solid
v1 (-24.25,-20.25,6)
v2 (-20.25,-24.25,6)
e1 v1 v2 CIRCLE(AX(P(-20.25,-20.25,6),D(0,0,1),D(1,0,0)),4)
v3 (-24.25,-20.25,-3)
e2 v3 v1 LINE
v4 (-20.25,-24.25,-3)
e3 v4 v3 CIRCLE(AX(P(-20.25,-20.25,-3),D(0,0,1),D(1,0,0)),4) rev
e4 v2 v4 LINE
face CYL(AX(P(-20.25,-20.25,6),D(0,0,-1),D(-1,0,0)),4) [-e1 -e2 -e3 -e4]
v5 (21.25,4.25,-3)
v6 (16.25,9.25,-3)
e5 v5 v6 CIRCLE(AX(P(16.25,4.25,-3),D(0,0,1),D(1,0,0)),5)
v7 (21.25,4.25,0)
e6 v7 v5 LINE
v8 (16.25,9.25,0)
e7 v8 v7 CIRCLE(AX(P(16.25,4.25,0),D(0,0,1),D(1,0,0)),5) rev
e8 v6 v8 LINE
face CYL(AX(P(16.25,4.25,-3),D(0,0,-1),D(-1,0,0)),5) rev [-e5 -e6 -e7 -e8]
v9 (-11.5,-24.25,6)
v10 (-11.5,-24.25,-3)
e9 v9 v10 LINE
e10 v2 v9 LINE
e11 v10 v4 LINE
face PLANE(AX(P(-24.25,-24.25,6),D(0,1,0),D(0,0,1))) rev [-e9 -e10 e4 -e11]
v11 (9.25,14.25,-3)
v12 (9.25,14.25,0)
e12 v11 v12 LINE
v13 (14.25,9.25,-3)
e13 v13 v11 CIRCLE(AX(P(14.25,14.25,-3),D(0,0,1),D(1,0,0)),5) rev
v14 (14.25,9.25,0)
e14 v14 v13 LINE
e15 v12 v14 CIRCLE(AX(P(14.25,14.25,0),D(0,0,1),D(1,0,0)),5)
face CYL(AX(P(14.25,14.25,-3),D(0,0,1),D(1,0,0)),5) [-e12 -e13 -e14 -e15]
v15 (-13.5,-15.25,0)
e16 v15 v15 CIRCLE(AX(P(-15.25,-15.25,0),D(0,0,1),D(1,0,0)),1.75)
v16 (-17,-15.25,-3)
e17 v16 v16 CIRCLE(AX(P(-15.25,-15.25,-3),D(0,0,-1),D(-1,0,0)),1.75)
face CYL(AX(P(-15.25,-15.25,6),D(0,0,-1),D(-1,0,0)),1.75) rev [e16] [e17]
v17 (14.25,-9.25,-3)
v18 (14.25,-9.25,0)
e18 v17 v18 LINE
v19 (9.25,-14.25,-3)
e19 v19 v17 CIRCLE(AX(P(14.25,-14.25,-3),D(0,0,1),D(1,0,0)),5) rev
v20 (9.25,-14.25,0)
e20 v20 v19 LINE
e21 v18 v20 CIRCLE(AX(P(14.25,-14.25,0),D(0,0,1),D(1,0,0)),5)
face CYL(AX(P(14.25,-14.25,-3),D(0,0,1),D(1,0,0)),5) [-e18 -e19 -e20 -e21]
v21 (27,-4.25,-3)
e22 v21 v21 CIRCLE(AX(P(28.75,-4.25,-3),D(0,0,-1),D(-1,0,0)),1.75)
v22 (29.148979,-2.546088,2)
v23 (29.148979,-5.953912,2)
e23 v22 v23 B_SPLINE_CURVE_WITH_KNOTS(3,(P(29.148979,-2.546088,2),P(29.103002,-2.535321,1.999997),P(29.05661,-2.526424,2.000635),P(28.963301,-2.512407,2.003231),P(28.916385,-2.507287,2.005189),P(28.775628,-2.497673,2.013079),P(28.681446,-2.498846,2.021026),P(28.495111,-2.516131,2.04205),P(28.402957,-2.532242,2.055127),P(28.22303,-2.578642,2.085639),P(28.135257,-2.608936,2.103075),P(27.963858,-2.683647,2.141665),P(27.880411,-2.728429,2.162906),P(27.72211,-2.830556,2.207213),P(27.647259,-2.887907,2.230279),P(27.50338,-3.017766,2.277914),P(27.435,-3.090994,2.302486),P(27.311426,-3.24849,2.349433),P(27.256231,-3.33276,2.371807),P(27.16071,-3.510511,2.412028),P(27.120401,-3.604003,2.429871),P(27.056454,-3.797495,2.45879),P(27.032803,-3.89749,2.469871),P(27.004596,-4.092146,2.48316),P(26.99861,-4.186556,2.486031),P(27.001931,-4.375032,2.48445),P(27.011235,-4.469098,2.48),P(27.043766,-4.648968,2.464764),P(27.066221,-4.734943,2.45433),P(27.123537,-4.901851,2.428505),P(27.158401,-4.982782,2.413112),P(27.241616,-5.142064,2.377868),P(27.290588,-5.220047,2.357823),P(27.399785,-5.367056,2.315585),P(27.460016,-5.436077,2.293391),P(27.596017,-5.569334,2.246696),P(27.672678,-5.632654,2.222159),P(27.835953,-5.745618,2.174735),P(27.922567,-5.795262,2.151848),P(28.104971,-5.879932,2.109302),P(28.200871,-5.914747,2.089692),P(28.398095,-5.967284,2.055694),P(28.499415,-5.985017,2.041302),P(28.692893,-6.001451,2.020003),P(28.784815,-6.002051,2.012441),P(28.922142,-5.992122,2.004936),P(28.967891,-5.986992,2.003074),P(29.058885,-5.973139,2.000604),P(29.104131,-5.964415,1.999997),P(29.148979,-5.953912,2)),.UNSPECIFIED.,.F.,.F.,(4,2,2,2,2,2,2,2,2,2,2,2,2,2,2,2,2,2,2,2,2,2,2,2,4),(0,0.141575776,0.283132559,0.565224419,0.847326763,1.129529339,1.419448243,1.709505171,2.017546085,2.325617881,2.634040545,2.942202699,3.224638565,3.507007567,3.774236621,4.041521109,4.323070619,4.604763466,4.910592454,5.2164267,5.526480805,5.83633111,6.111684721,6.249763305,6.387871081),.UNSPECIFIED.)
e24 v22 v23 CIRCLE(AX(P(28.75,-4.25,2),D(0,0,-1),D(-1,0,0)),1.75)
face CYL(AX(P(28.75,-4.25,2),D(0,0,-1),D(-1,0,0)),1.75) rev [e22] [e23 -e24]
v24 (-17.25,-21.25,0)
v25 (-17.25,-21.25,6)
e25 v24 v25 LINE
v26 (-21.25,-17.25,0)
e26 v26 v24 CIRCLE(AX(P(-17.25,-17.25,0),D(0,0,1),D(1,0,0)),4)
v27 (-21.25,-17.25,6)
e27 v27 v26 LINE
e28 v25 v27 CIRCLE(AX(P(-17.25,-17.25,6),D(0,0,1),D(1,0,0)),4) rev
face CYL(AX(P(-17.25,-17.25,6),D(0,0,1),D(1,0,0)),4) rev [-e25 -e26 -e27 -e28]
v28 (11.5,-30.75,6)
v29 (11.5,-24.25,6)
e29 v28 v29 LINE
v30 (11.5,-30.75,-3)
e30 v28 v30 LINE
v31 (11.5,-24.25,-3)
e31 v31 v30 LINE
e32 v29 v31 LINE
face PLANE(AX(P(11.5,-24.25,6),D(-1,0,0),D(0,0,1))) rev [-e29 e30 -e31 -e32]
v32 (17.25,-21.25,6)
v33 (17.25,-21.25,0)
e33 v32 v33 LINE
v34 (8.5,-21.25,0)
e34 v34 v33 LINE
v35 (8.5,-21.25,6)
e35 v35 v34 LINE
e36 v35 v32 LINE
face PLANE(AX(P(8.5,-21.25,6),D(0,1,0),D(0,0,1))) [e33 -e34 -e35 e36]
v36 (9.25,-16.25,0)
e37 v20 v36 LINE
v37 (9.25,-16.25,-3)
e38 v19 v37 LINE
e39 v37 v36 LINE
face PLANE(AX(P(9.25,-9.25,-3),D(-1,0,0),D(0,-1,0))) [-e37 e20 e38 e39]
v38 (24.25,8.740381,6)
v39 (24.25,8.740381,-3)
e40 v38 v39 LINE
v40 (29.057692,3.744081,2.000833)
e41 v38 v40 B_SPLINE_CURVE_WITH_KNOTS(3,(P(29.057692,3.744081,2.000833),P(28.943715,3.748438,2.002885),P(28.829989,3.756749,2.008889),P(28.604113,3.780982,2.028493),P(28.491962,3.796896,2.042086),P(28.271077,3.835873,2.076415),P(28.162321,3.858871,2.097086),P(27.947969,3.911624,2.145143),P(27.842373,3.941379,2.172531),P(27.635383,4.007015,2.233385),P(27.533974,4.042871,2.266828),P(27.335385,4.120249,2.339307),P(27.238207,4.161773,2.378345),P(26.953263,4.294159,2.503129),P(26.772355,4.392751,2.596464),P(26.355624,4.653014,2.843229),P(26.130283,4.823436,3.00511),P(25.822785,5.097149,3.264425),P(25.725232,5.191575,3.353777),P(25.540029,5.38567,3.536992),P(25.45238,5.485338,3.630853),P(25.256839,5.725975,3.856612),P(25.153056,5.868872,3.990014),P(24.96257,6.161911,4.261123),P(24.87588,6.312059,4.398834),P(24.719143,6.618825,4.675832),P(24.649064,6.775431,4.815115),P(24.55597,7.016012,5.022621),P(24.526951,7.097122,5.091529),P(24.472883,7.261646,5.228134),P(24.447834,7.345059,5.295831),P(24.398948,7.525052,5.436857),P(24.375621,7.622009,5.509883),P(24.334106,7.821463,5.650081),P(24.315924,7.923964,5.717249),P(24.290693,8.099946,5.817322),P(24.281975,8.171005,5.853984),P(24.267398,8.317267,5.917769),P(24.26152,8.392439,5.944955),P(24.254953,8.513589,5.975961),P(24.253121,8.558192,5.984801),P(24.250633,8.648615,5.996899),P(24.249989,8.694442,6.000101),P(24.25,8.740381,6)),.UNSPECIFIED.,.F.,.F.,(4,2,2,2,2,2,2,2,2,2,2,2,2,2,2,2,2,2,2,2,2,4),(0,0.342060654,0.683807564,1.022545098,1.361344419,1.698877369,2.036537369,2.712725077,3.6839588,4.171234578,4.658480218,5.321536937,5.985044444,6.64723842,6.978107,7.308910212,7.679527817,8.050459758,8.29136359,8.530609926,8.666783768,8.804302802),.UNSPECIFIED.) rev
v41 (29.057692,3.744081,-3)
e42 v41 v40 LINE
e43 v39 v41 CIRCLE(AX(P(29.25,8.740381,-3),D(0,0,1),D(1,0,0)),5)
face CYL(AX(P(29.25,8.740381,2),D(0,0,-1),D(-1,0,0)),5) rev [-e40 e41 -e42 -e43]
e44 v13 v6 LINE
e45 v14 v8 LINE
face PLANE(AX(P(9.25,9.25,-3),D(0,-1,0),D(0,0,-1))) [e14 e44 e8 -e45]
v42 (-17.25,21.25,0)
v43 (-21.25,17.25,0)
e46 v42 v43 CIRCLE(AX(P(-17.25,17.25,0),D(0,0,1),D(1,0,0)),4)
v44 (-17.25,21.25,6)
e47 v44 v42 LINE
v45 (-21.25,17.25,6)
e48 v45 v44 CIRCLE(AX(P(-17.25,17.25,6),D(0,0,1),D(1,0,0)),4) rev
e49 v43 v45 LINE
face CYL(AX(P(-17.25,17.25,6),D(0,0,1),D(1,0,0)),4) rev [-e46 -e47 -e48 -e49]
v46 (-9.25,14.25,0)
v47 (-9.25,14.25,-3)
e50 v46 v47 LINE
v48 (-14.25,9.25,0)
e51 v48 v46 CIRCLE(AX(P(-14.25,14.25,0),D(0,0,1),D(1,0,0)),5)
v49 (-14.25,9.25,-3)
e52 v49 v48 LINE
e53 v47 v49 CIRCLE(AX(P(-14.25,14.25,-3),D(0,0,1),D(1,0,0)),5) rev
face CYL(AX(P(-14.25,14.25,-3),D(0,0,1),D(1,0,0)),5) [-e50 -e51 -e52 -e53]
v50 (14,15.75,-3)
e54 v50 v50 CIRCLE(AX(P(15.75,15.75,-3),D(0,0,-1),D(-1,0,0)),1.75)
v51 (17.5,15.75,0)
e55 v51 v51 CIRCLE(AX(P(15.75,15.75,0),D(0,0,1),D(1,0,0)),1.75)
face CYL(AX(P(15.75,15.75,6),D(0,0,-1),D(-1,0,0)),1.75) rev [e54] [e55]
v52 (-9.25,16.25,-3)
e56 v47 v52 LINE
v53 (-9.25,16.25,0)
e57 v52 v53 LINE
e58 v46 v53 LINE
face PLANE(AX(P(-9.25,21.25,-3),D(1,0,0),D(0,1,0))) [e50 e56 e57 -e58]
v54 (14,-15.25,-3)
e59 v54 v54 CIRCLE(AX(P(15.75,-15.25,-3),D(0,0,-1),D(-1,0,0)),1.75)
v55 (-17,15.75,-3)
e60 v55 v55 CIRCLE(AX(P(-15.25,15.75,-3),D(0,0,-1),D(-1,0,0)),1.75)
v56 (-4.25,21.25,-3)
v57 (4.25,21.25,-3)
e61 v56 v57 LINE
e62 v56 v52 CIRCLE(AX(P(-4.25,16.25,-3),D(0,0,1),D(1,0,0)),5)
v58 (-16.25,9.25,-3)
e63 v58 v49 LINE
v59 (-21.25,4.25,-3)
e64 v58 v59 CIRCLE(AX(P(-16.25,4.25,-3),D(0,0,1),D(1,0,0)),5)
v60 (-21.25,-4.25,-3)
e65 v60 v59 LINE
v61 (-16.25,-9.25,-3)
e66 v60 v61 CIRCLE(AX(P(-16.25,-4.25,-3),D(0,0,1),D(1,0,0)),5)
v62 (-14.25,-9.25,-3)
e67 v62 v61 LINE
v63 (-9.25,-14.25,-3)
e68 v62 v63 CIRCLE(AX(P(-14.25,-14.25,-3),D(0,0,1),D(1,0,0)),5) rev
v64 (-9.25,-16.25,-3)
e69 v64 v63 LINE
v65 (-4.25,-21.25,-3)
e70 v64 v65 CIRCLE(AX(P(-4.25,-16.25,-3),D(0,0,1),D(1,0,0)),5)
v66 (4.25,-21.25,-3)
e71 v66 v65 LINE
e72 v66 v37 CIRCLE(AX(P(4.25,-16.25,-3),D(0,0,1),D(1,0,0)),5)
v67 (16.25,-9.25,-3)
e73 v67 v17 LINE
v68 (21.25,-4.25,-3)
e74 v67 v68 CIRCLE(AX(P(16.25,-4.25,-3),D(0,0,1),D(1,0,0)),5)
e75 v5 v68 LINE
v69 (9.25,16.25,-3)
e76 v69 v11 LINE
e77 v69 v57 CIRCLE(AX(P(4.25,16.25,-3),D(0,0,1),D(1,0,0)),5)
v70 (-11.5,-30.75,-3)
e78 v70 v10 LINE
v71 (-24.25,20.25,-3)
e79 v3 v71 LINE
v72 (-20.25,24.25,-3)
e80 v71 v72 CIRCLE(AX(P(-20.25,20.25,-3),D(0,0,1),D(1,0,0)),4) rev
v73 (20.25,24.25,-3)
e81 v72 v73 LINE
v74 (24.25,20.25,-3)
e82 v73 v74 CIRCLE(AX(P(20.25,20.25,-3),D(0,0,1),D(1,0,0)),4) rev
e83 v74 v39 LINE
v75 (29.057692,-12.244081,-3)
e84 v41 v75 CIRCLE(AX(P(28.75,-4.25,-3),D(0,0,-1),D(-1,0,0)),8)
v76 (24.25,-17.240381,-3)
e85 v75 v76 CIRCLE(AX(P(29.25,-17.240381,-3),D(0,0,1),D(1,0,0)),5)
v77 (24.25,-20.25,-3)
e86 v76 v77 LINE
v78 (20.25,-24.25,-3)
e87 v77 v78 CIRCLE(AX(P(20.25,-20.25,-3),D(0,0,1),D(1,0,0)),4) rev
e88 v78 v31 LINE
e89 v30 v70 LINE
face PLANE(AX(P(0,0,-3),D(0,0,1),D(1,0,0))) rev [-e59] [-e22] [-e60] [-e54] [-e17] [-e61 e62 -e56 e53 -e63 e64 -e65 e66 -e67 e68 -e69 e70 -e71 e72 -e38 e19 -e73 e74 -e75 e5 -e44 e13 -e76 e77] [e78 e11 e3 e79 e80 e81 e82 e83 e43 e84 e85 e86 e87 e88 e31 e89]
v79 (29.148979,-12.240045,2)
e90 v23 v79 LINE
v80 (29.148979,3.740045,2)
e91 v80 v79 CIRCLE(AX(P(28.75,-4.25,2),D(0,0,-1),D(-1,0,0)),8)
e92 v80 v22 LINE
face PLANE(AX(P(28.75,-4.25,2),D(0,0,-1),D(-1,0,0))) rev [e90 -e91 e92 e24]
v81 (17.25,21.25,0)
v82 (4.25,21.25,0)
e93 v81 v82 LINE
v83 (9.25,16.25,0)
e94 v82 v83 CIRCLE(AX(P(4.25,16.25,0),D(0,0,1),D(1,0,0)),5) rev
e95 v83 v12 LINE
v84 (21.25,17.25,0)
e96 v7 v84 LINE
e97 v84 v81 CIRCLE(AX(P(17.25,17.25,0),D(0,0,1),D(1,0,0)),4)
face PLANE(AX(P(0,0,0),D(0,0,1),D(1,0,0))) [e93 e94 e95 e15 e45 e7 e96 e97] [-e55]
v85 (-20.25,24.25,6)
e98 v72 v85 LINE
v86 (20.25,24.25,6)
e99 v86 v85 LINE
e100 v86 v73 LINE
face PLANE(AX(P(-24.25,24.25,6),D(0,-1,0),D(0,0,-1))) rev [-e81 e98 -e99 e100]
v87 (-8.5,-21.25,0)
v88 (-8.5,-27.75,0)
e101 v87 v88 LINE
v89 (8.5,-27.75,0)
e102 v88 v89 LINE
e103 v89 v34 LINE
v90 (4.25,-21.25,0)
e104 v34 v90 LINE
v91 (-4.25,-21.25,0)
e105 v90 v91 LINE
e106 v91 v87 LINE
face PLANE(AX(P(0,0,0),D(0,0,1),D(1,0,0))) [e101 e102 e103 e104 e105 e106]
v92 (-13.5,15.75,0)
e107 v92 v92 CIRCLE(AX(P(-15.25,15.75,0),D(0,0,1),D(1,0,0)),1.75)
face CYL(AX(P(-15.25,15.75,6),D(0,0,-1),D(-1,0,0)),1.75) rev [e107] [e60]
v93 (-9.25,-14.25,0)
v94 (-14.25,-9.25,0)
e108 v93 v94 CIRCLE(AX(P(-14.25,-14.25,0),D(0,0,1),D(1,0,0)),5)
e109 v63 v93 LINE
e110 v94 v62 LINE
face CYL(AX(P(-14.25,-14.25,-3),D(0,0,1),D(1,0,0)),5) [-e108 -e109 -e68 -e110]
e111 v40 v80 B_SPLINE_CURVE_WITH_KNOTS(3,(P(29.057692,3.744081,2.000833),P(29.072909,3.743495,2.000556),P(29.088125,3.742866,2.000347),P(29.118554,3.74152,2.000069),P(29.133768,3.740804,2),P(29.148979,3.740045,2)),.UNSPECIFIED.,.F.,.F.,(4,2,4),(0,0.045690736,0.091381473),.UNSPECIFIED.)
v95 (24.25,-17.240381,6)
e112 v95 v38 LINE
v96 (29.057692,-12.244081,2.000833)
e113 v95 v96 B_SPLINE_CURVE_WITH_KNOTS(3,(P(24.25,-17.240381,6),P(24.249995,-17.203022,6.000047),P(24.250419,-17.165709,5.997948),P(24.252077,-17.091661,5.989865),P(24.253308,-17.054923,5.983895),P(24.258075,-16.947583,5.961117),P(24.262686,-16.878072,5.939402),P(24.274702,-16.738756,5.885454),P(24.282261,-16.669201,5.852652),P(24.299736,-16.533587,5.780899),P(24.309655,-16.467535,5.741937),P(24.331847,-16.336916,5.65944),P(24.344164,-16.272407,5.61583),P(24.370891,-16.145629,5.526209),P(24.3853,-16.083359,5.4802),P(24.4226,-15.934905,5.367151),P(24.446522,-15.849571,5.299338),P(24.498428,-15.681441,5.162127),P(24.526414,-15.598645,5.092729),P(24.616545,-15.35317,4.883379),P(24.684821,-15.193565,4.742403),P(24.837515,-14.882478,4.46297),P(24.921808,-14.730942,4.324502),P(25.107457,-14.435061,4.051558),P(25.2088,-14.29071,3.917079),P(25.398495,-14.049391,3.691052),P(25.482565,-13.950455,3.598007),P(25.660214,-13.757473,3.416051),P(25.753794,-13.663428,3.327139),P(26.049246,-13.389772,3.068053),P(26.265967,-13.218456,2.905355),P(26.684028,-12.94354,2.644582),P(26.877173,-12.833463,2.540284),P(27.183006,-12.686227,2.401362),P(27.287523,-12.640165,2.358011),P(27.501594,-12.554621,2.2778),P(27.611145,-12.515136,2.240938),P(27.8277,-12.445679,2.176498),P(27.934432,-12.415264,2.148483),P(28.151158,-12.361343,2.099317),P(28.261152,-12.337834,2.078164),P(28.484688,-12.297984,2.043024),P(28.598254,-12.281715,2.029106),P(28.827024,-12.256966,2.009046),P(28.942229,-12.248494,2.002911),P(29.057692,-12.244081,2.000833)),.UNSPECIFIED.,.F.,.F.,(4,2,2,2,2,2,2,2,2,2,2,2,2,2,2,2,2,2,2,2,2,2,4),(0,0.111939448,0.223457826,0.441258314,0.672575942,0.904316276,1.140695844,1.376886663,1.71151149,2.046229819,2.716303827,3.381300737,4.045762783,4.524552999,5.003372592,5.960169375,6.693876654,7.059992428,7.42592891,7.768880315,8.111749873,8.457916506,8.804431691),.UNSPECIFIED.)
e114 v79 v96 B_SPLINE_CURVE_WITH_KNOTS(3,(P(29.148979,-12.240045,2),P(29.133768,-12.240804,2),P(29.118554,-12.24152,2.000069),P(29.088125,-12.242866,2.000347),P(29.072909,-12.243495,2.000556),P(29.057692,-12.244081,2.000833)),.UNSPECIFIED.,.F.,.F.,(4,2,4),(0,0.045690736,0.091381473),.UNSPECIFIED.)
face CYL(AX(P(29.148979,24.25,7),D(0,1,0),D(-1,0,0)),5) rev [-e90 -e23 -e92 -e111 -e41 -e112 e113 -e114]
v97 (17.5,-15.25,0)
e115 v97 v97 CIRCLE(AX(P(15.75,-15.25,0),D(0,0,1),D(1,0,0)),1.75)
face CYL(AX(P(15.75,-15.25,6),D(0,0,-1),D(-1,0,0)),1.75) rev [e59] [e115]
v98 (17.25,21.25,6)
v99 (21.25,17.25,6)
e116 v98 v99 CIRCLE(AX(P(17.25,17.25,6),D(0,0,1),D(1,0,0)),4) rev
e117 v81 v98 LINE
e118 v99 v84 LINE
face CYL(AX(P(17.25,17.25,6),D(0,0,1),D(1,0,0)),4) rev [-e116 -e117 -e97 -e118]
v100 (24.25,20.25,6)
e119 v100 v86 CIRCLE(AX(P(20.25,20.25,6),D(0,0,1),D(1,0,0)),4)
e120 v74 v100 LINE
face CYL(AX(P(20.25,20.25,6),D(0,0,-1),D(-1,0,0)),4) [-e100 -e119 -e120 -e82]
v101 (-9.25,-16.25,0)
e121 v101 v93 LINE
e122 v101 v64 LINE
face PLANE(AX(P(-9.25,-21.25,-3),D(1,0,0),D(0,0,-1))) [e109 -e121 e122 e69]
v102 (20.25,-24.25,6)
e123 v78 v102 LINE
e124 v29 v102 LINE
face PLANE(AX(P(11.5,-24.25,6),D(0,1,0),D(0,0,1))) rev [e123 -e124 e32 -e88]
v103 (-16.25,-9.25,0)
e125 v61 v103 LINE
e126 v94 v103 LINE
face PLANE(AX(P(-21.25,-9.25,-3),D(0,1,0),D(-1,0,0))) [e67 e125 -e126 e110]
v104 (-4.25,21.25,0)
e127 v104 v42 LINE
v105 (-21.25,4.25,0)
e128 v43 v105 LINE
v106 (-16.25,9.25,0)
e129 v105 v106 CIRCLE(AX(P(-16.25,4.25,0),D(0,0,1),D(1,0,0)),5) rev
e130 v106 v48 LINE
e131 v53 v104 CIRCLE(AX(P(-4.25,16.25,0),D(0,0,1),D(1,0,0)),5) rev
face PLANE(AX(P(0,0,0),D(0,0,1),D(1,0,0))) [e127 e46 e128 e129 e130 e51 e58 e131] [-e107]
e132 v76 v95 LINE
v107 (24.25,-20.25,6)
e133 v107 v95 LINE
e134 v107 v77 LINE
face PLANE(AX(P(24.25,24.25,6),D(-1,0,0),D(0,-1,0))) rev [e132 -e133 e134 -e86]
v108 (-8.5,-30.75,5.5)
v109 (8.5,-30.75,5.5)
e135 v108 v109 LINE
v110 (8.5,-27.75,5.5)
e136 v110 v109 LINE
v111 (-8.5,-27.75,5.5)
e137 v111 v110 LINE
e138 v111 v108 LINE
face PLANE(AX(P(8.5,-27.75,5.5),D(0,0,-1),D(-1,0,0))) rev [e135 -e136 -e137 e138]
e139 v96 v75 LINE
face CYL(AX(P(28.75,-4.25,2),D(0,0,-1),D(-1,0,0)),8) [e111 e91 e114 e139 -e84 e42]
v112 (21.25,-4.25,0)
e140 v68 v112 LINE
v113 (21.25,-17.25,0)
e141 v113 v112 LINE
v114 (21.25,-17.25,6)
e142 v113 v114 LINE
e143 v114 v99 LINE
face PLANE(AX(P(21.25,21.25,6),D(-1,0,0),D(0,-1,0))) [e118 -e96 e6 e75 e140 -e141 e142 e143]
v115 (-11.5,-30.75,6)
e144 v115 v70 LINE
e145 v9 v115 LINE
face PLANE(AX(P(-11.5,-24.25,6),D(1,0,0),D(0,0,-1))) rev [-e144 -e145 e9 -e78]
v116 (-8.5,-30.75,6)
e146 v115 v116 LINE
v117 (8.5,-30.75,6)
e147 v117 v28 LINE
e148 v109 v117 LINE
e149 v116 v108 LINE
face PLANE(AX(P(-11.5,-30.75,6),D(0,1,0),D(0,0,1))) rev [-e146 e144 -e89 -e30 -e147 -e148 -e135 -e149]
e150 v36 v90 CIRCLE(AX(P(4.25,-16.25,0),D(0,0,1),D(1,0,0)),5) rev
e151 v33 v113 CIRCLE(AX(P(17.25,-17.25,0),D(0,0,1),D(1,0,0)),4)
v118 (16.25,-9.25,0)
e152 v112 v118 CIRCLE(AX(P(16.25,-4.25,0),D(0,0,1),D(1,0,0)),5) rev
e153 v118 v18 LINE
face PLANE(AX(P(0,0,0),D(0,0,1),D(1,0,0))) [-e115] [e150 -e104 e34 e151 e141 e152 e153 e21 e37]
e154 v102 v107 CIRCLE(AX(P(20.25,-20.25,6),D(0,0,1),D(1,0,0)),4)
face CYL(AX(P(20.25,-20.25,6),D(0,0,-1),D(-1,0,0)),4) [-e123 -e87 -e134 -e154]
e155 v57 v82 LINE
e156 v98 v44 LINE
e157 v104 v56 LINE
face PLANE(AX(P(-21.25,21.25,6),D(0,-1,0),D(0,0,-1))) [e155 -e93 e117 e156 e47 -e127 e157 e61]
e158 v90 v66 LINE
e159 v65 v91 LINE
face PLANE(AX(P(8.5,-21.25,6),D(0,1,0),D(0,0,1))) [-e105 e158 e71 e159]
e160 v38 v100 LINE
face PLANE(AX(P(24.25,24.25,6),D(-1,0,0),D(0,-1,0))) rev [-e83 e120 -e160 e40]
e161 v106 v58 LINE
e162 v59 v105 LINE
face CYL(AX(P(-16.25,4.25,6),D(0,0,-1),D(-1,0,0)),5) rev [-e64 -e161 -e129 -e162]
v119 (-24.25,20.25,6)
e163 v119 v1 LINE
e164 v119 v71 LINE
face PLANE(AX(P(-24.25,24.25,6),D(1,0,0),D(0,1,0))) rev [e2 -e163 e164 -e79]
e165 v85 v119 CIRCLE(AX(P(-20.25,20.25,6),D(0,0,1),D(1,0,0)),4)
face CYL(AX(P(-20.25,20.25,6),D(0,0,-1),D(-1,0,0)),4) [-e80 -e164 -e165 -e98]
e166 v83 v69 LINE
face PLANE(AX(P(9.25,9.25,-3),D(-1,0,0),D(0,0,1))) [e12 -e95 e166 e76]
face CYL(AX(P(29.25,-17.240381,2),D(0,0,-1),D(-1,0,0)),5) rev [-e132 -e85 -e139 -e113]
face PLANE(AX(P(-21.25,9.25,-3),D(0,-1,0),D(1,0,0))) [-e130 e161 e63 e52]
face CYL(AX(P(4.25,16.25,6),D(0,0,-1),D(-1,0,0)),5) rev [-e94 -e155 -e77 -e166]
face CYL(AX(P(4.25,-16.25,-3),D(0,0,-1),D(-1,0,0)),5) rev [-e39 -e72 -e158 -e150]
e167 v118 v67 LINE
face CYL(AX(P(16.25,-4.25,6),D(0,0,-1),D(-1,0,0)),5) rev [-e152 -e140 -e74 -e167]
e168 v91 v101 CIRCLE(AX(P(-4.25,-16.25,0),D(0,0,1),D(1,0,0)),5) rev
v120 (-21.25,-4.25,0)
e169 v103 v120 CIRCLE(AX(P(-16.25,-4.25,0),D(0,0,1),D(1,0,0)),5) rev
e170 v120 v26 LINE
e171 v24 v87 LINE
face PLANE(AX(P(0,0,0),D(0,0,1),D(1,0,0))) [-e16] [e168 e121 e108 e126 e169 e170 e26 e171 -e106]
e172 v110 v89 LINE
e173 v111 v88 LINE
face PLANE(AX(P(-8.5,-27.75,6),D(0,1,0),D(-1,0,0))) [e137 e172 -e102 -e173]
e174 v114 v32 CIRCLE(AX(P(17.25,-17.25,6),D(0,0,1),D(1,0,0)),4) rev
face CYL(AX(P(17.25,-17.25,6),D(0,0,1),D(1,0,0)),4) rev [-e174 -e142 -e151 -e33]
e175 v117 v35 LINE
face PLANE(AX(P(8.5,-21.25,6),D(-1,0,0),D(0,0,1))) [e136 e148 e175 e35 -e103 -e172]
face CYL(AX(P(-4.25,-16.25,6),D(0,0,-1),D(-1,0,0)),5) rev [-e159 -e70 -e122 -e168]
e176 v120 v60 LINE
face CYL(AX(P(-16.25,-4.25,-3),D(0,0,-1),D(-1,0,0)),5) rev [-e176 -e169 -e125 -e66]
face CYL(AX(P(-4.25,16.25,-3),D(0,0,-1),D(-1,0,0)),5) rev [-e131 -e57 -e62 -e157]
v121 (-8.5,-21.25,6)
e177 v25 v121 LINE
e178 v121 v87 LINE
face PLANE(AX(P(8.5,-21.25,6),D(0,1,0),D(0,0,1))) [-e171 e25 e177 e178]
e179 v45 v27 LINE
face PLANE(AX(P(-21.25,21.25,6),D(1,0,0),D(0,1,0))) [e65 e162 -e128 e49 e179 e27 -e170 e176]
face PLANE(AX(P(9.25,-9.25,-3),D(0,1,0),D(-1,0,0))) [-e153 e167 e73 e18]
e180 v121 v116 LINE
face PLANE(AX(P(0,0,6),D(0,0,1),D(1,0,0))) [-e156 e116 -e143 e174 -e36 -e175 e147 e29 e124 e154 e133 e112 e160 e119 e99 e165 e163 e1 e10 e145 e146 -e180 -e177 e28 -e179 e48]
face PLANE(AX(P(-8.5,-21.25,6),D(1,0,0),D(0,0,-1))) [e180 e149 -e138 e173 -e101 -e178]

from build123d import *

# Parameters (mm, degrees)
BOSS_EXTRUDE3_DEPTH = 6
BOSS_EXTRUDE4_DEPTH = 3
SKETCH5_W           = 17
SKETCH5_H           = 5.5
CUT_EXTRUDE1_DEPTH  = 3
SKETCH6_R           = 1.75
CUT_EXTRUDE2_DEPTH  = 41.182396643
SKETCH7_R           = 1.75
BOSS_EXTRUDE5_DEPTH = 5
FILLET1_START       = -17.240381157
FILLET1_DEPTH       = 25.980762314
FILLET1_START_2     = 2
FILLET1_2_DEPTH     = 4.000072473
FILLET1_START_3     = -3
FILLET1_3_DEPTH     = 5
FILLET2_R           = 4
FILLET3_R           = 5


with BuildPart() as part:
    # Sketch1 → Boss-Extrude3 (new body)
    with BuildSketch(Plane.XY):
        Polygon((-24.25, 24.25), (24.25, 24.25), (24.25, -24.25), (11.5, -24.25), (11.5, -30.75), (-11.5, -30.75), (-11.5, -24.25), (-24.25, -24.25), align=None)
        Polygon((-21.25, 21.25), (21.25, 21.25), (21.25, -21.25), (8.5, -21.25), (8.5, -27.75), (-8.5, -27.75), (-8.5, -21.25), (-21.25, -21.25), align=None, mode=Mode.SUBTRACT)
    extrude(amount=BOSS_EXTRUDE3_DEPTH)

    # Sketch4 → Boss-Extrude4 (add)
    with BuildSketch(Plane(origin=(0, 0, 0), x_dir=(-1, 0, 0), z_dir=(0, 0, -1))):
        Polygon((-24.25, -24.25), (-24.25, 24.25), (24.25, 24.25), (24.25, -24.25), (11.5, -24.25), (11.5, -30.75), (-11.5, -30.75), (-11.5, -24.25), align=None)
        Polygon((-9.25, 21.25), (9.25, 21.25), (9.25, 9.25), (21.25, 9.25), (21.25, -9.25), (9.25, -9.25), (9.25, -21.25), (-9.25, -21.25), (-9.25, -9.25), (-21.25, -9.25), (-21.25, 9.25), (-9.25, 9.25), align=None, mode=Mode.SUBTRACT)
    extrude(amount=BOSS_EXTRUDE4_DEPTH)

    # Sketch5 → Cut-Extrude1 (cut)
    with BuildSketch(Plane.XZ.offset(30.75)):
        with Locations((0, 8.25)):
            Rectangle(SKETCH5_W, SKETCH5_H)
    extrude(amount=-CUT_EXTRUDE1_DEPTH, mode=Mode.SUBTRACT)

    # Sketch6 → Cut-Extrude2 (cut, through all)
    with BuildSketch(Plane(origin=(0, 0, -3), x_dir=(-1, 0, 0), z_dir=(0, 0, -1))):
        with Locations((-15.75, 15.75)):
            Circle(SKETCH6_R)
        with Locations((15.25, 15.75)):
            Circle(SKETCH6_R)
        with Locations((15.25, -15.25)):
            Circle(SKETCH6_R)
        with Locations((-15.75, -15.25)):
            Circle(SKETCH6_R)
    extrude(amount=-CUT_EXTRUDE2_DEPTH, mode=Mode.SUBTRACT)

    # Sketch7 → Boss-Extrude5 (add)
    with BuildSketch(Plane(origin=(0, 0, -3), x_dir=(-1, 0, 0), z_dir=(0, 0, -1))):
        with BuildLine():
            Line((-28.75, 3.75), (-24.25, 3.75))
            Line((-24.25, 3.75), (-24.25, -12.25))
            Line((-24.25, -12.25), (-28.75, -12.25))
            ThreePointArc((-28.75, -12.25), (-36.75, -4.25), (-28.75, 3.75))
        make_face()
        with Locations((-28.75, -4.25)):
            Circle(SKETCH7_R, mode=Mode.SUBTRACT)
    extrude(amount=-BOSS_EXTRUDE5_DEPTH)

    # Fillet1: read off the stored shape, not the designer's step
    # Fillet1 outline → Fillet1 (add)
    with BuildSketch(Plane(origin=(0, 0, 0), x_dir=(1, 0, 0), z_dir=(0, 1, 0)).offset(FILLET1_START)):
        with BuildLine():
            ThreePointArc((24.249985207, -6.000072473), (25.986673178, -3.127040044), (29.148979486, -2))
            Line((29.148979486, -2), (24.25, -2))
            Line((24.25, -2), (24.249985207, -6.000072473))
        make_face()
    extrude(amount=FILLET1_DEPTH)

    # Fillet1 2 outline → Fillet1 2 (cut)
    with BuildSketch(Plane.XY.offset(FILLET1_START_2)):
        with BuildLine():
            ThreePointArc((29.057692308, -12.24408065), (25.647116539, -13.77350483), (24.25, -17.240381057))
            Line((24.25, -17.240381057), (29.148979486, -17.240381157))
            Line((29.148979486, -17.240381157), (29.148979486, -12.240044766))
            ThreePointArc((29.148979486, -12.240044766), (29.103341659, -12.242193045), (29.057692308, -12.24408065))
        make_face()
        with BuildLine():
            ThreePointArc((29.057692308, 3.74408065), (29.103341659, 3.742193045), (29.148979486, 3.740044766))
            Line((29.148979486, 3.740044766), (29.148979486, 8.740381157))
            Line((29.148979486, 8.740381157), (24.25, 8.740381057))
            ThreePointArc((24.25, 8.740381057), (25.647116539, 5.27350483), (29.057692308, 3.74408065))
        make_face()
        with BuildLine():
            Line((29.148979486, -5.953911785), (29.148979486, -2.546088215))
            ThreePointArc((29.148979486, -2.546088215), (27, -4.25), (29.148979486, -5.953911785))
        make_face()
    extrude(amount=FILLET1_2_DEPTH, mode=Mode.SUBTRACT)

    # Fillet1 3 outline → Fillet1 3 (add)
    with BuildSketch(Plane.XY.offset(FILLET1_START_3)):
        with BuildLine():
            Line((24.25, -12.25), (24.25, -17.240381057))
            ThreePointArc((24.25, -17.240381057), (25.647116539, -13.77350483), (29.057692308, -12.24408065))
            ThreePointArc((29.057692308, -12.24408065), (28.90387462, -12.248520026), (28.75, -12.25))
            Line((28.75, -12.25), (24.25, -12.25))
        make_face()
        with BuildLine():
            ThreePointArc((28.75, 3.75), (28.90387462, 3.748520026), (29.057692308, 3.74408065))
            ThreePointArc((29.057692308, 3.74408065), (25.647116539, 5.27350483), (24.25, 8.740381057))
            Line((24.25, 8.740381057), (24.25, 3.75))
            Line((24.25, 3.75), (28.75, 3.75))
        make_face()
    extrude(amount=FILLET1_3_DEPTH)

    # Fillet2
    fillet2_edges = [part.edges().sort_by_distance(p)[0] for p in [
        (-24.25, 24.25, 1.5),
        (24.25, 24.25, 1.5),
        (24.25, -24.25, 1.5),
        (-24.25, -24.25, 1.5),
        (21.25, -21.25, 3),
        (21.25, 21.25, 3),
        (-21.25, 21.25, 3),
        (-21.25, -21.25, 3),
    ]]
    fillet(fillet2_edges, radius=FILLET2_R)

    # Fillet3
    # the kernel refuses this fillet: 5 mm, written as the material it adds along each edge
    with BuildSketch(Plane(origin=(21.25, 9.25, 0), x_dir=(0, -1, 0), z_dir=(0, 0, -1)), Plane(origin=(9.25, -21.25, 0), x_dir=(-1, 0, 0), z_dir=(0, 0, -1)), Plane(origin=(-21.25, -9.25, 0), x_dir=(0, 1, 0), z_dir=(0, 0, -1)), Plane(origin=(-9.25, 21.25, 0), x_dir=(1, 0, 0), z_dir=(0, 0, -1))) as fillet3_piece_1:
        with BuildLine():
            CenterArc((FILLET3_R, FILLET3_R), FILLET3_R, 180, 90)
            Line((0, FILLET3_R), (0, 0))
            Line((0, 0), (FILLET3_R, 0))
        make_face()
    extrude(amount=3)
    with BuildSketch(Plane(origin=(21.25, -9.25, 0), x_dir=(0, 1, 0), z_dir=(0, 0, -1)), Plane(origin=(-9.25, -21.25, 0), x_dir=(1, 0, 0), z_dir=(0, 0, -1)), Plane(origin=(-21.25, 9.25, 0), x_dir=(0, -1, 0), z_dir=(0, 0, -1)), Plane(origin=(9.25, 21.25, 0), x_dir=(-1, 0, 0), z_dir=(0, 0, -1))) as fillet3_piece_2:
        with BuildLine():
            CenterArc((FILLET3_R, -FILLET3_R), FILLET3_R, 90, 90)
            Line((0, -FILLET3_R), (0, 0))
            Line((0, 0), (FILLET3_R, 0))
        make_face()
    extrude(amount=3)
    # the kernel refuses this fillet: 5 mm, written as the material it takes off along each edge
    with BuildSketch(Plane(origin=(9.25, 9.25, 12.5), x_dir=(1, 0, 0), z_dir=(0, 0, -1)), Plane(origin=(9.25, -9.25, 12.5), x_dir=(0, -1, 0), z_dir=(0, 0, -1)), Plane(origin=(-9.25, -9.25, 12.5), x_dir=(-1, 0, 0), z_dir=(0, 0, -1)), Plane(origin=(-9.25, 9.25, 12.5), x_dir=(0, 1, 0), z_dir=(0, 0, -1))) as fillet3_2_piece_1:
        with BuildLine():
            CenterArc((FILLET3_R, -FILLET3_R), FILLET3_R, 90, 90)
            Line((0, -FILLET3_R), (0, 0))
            Line((0, 0), (FILLET3_R, 0))
        make_face()
    extrude(amount=28, mode=Mode.SUBTRACT)


solid = part.part
